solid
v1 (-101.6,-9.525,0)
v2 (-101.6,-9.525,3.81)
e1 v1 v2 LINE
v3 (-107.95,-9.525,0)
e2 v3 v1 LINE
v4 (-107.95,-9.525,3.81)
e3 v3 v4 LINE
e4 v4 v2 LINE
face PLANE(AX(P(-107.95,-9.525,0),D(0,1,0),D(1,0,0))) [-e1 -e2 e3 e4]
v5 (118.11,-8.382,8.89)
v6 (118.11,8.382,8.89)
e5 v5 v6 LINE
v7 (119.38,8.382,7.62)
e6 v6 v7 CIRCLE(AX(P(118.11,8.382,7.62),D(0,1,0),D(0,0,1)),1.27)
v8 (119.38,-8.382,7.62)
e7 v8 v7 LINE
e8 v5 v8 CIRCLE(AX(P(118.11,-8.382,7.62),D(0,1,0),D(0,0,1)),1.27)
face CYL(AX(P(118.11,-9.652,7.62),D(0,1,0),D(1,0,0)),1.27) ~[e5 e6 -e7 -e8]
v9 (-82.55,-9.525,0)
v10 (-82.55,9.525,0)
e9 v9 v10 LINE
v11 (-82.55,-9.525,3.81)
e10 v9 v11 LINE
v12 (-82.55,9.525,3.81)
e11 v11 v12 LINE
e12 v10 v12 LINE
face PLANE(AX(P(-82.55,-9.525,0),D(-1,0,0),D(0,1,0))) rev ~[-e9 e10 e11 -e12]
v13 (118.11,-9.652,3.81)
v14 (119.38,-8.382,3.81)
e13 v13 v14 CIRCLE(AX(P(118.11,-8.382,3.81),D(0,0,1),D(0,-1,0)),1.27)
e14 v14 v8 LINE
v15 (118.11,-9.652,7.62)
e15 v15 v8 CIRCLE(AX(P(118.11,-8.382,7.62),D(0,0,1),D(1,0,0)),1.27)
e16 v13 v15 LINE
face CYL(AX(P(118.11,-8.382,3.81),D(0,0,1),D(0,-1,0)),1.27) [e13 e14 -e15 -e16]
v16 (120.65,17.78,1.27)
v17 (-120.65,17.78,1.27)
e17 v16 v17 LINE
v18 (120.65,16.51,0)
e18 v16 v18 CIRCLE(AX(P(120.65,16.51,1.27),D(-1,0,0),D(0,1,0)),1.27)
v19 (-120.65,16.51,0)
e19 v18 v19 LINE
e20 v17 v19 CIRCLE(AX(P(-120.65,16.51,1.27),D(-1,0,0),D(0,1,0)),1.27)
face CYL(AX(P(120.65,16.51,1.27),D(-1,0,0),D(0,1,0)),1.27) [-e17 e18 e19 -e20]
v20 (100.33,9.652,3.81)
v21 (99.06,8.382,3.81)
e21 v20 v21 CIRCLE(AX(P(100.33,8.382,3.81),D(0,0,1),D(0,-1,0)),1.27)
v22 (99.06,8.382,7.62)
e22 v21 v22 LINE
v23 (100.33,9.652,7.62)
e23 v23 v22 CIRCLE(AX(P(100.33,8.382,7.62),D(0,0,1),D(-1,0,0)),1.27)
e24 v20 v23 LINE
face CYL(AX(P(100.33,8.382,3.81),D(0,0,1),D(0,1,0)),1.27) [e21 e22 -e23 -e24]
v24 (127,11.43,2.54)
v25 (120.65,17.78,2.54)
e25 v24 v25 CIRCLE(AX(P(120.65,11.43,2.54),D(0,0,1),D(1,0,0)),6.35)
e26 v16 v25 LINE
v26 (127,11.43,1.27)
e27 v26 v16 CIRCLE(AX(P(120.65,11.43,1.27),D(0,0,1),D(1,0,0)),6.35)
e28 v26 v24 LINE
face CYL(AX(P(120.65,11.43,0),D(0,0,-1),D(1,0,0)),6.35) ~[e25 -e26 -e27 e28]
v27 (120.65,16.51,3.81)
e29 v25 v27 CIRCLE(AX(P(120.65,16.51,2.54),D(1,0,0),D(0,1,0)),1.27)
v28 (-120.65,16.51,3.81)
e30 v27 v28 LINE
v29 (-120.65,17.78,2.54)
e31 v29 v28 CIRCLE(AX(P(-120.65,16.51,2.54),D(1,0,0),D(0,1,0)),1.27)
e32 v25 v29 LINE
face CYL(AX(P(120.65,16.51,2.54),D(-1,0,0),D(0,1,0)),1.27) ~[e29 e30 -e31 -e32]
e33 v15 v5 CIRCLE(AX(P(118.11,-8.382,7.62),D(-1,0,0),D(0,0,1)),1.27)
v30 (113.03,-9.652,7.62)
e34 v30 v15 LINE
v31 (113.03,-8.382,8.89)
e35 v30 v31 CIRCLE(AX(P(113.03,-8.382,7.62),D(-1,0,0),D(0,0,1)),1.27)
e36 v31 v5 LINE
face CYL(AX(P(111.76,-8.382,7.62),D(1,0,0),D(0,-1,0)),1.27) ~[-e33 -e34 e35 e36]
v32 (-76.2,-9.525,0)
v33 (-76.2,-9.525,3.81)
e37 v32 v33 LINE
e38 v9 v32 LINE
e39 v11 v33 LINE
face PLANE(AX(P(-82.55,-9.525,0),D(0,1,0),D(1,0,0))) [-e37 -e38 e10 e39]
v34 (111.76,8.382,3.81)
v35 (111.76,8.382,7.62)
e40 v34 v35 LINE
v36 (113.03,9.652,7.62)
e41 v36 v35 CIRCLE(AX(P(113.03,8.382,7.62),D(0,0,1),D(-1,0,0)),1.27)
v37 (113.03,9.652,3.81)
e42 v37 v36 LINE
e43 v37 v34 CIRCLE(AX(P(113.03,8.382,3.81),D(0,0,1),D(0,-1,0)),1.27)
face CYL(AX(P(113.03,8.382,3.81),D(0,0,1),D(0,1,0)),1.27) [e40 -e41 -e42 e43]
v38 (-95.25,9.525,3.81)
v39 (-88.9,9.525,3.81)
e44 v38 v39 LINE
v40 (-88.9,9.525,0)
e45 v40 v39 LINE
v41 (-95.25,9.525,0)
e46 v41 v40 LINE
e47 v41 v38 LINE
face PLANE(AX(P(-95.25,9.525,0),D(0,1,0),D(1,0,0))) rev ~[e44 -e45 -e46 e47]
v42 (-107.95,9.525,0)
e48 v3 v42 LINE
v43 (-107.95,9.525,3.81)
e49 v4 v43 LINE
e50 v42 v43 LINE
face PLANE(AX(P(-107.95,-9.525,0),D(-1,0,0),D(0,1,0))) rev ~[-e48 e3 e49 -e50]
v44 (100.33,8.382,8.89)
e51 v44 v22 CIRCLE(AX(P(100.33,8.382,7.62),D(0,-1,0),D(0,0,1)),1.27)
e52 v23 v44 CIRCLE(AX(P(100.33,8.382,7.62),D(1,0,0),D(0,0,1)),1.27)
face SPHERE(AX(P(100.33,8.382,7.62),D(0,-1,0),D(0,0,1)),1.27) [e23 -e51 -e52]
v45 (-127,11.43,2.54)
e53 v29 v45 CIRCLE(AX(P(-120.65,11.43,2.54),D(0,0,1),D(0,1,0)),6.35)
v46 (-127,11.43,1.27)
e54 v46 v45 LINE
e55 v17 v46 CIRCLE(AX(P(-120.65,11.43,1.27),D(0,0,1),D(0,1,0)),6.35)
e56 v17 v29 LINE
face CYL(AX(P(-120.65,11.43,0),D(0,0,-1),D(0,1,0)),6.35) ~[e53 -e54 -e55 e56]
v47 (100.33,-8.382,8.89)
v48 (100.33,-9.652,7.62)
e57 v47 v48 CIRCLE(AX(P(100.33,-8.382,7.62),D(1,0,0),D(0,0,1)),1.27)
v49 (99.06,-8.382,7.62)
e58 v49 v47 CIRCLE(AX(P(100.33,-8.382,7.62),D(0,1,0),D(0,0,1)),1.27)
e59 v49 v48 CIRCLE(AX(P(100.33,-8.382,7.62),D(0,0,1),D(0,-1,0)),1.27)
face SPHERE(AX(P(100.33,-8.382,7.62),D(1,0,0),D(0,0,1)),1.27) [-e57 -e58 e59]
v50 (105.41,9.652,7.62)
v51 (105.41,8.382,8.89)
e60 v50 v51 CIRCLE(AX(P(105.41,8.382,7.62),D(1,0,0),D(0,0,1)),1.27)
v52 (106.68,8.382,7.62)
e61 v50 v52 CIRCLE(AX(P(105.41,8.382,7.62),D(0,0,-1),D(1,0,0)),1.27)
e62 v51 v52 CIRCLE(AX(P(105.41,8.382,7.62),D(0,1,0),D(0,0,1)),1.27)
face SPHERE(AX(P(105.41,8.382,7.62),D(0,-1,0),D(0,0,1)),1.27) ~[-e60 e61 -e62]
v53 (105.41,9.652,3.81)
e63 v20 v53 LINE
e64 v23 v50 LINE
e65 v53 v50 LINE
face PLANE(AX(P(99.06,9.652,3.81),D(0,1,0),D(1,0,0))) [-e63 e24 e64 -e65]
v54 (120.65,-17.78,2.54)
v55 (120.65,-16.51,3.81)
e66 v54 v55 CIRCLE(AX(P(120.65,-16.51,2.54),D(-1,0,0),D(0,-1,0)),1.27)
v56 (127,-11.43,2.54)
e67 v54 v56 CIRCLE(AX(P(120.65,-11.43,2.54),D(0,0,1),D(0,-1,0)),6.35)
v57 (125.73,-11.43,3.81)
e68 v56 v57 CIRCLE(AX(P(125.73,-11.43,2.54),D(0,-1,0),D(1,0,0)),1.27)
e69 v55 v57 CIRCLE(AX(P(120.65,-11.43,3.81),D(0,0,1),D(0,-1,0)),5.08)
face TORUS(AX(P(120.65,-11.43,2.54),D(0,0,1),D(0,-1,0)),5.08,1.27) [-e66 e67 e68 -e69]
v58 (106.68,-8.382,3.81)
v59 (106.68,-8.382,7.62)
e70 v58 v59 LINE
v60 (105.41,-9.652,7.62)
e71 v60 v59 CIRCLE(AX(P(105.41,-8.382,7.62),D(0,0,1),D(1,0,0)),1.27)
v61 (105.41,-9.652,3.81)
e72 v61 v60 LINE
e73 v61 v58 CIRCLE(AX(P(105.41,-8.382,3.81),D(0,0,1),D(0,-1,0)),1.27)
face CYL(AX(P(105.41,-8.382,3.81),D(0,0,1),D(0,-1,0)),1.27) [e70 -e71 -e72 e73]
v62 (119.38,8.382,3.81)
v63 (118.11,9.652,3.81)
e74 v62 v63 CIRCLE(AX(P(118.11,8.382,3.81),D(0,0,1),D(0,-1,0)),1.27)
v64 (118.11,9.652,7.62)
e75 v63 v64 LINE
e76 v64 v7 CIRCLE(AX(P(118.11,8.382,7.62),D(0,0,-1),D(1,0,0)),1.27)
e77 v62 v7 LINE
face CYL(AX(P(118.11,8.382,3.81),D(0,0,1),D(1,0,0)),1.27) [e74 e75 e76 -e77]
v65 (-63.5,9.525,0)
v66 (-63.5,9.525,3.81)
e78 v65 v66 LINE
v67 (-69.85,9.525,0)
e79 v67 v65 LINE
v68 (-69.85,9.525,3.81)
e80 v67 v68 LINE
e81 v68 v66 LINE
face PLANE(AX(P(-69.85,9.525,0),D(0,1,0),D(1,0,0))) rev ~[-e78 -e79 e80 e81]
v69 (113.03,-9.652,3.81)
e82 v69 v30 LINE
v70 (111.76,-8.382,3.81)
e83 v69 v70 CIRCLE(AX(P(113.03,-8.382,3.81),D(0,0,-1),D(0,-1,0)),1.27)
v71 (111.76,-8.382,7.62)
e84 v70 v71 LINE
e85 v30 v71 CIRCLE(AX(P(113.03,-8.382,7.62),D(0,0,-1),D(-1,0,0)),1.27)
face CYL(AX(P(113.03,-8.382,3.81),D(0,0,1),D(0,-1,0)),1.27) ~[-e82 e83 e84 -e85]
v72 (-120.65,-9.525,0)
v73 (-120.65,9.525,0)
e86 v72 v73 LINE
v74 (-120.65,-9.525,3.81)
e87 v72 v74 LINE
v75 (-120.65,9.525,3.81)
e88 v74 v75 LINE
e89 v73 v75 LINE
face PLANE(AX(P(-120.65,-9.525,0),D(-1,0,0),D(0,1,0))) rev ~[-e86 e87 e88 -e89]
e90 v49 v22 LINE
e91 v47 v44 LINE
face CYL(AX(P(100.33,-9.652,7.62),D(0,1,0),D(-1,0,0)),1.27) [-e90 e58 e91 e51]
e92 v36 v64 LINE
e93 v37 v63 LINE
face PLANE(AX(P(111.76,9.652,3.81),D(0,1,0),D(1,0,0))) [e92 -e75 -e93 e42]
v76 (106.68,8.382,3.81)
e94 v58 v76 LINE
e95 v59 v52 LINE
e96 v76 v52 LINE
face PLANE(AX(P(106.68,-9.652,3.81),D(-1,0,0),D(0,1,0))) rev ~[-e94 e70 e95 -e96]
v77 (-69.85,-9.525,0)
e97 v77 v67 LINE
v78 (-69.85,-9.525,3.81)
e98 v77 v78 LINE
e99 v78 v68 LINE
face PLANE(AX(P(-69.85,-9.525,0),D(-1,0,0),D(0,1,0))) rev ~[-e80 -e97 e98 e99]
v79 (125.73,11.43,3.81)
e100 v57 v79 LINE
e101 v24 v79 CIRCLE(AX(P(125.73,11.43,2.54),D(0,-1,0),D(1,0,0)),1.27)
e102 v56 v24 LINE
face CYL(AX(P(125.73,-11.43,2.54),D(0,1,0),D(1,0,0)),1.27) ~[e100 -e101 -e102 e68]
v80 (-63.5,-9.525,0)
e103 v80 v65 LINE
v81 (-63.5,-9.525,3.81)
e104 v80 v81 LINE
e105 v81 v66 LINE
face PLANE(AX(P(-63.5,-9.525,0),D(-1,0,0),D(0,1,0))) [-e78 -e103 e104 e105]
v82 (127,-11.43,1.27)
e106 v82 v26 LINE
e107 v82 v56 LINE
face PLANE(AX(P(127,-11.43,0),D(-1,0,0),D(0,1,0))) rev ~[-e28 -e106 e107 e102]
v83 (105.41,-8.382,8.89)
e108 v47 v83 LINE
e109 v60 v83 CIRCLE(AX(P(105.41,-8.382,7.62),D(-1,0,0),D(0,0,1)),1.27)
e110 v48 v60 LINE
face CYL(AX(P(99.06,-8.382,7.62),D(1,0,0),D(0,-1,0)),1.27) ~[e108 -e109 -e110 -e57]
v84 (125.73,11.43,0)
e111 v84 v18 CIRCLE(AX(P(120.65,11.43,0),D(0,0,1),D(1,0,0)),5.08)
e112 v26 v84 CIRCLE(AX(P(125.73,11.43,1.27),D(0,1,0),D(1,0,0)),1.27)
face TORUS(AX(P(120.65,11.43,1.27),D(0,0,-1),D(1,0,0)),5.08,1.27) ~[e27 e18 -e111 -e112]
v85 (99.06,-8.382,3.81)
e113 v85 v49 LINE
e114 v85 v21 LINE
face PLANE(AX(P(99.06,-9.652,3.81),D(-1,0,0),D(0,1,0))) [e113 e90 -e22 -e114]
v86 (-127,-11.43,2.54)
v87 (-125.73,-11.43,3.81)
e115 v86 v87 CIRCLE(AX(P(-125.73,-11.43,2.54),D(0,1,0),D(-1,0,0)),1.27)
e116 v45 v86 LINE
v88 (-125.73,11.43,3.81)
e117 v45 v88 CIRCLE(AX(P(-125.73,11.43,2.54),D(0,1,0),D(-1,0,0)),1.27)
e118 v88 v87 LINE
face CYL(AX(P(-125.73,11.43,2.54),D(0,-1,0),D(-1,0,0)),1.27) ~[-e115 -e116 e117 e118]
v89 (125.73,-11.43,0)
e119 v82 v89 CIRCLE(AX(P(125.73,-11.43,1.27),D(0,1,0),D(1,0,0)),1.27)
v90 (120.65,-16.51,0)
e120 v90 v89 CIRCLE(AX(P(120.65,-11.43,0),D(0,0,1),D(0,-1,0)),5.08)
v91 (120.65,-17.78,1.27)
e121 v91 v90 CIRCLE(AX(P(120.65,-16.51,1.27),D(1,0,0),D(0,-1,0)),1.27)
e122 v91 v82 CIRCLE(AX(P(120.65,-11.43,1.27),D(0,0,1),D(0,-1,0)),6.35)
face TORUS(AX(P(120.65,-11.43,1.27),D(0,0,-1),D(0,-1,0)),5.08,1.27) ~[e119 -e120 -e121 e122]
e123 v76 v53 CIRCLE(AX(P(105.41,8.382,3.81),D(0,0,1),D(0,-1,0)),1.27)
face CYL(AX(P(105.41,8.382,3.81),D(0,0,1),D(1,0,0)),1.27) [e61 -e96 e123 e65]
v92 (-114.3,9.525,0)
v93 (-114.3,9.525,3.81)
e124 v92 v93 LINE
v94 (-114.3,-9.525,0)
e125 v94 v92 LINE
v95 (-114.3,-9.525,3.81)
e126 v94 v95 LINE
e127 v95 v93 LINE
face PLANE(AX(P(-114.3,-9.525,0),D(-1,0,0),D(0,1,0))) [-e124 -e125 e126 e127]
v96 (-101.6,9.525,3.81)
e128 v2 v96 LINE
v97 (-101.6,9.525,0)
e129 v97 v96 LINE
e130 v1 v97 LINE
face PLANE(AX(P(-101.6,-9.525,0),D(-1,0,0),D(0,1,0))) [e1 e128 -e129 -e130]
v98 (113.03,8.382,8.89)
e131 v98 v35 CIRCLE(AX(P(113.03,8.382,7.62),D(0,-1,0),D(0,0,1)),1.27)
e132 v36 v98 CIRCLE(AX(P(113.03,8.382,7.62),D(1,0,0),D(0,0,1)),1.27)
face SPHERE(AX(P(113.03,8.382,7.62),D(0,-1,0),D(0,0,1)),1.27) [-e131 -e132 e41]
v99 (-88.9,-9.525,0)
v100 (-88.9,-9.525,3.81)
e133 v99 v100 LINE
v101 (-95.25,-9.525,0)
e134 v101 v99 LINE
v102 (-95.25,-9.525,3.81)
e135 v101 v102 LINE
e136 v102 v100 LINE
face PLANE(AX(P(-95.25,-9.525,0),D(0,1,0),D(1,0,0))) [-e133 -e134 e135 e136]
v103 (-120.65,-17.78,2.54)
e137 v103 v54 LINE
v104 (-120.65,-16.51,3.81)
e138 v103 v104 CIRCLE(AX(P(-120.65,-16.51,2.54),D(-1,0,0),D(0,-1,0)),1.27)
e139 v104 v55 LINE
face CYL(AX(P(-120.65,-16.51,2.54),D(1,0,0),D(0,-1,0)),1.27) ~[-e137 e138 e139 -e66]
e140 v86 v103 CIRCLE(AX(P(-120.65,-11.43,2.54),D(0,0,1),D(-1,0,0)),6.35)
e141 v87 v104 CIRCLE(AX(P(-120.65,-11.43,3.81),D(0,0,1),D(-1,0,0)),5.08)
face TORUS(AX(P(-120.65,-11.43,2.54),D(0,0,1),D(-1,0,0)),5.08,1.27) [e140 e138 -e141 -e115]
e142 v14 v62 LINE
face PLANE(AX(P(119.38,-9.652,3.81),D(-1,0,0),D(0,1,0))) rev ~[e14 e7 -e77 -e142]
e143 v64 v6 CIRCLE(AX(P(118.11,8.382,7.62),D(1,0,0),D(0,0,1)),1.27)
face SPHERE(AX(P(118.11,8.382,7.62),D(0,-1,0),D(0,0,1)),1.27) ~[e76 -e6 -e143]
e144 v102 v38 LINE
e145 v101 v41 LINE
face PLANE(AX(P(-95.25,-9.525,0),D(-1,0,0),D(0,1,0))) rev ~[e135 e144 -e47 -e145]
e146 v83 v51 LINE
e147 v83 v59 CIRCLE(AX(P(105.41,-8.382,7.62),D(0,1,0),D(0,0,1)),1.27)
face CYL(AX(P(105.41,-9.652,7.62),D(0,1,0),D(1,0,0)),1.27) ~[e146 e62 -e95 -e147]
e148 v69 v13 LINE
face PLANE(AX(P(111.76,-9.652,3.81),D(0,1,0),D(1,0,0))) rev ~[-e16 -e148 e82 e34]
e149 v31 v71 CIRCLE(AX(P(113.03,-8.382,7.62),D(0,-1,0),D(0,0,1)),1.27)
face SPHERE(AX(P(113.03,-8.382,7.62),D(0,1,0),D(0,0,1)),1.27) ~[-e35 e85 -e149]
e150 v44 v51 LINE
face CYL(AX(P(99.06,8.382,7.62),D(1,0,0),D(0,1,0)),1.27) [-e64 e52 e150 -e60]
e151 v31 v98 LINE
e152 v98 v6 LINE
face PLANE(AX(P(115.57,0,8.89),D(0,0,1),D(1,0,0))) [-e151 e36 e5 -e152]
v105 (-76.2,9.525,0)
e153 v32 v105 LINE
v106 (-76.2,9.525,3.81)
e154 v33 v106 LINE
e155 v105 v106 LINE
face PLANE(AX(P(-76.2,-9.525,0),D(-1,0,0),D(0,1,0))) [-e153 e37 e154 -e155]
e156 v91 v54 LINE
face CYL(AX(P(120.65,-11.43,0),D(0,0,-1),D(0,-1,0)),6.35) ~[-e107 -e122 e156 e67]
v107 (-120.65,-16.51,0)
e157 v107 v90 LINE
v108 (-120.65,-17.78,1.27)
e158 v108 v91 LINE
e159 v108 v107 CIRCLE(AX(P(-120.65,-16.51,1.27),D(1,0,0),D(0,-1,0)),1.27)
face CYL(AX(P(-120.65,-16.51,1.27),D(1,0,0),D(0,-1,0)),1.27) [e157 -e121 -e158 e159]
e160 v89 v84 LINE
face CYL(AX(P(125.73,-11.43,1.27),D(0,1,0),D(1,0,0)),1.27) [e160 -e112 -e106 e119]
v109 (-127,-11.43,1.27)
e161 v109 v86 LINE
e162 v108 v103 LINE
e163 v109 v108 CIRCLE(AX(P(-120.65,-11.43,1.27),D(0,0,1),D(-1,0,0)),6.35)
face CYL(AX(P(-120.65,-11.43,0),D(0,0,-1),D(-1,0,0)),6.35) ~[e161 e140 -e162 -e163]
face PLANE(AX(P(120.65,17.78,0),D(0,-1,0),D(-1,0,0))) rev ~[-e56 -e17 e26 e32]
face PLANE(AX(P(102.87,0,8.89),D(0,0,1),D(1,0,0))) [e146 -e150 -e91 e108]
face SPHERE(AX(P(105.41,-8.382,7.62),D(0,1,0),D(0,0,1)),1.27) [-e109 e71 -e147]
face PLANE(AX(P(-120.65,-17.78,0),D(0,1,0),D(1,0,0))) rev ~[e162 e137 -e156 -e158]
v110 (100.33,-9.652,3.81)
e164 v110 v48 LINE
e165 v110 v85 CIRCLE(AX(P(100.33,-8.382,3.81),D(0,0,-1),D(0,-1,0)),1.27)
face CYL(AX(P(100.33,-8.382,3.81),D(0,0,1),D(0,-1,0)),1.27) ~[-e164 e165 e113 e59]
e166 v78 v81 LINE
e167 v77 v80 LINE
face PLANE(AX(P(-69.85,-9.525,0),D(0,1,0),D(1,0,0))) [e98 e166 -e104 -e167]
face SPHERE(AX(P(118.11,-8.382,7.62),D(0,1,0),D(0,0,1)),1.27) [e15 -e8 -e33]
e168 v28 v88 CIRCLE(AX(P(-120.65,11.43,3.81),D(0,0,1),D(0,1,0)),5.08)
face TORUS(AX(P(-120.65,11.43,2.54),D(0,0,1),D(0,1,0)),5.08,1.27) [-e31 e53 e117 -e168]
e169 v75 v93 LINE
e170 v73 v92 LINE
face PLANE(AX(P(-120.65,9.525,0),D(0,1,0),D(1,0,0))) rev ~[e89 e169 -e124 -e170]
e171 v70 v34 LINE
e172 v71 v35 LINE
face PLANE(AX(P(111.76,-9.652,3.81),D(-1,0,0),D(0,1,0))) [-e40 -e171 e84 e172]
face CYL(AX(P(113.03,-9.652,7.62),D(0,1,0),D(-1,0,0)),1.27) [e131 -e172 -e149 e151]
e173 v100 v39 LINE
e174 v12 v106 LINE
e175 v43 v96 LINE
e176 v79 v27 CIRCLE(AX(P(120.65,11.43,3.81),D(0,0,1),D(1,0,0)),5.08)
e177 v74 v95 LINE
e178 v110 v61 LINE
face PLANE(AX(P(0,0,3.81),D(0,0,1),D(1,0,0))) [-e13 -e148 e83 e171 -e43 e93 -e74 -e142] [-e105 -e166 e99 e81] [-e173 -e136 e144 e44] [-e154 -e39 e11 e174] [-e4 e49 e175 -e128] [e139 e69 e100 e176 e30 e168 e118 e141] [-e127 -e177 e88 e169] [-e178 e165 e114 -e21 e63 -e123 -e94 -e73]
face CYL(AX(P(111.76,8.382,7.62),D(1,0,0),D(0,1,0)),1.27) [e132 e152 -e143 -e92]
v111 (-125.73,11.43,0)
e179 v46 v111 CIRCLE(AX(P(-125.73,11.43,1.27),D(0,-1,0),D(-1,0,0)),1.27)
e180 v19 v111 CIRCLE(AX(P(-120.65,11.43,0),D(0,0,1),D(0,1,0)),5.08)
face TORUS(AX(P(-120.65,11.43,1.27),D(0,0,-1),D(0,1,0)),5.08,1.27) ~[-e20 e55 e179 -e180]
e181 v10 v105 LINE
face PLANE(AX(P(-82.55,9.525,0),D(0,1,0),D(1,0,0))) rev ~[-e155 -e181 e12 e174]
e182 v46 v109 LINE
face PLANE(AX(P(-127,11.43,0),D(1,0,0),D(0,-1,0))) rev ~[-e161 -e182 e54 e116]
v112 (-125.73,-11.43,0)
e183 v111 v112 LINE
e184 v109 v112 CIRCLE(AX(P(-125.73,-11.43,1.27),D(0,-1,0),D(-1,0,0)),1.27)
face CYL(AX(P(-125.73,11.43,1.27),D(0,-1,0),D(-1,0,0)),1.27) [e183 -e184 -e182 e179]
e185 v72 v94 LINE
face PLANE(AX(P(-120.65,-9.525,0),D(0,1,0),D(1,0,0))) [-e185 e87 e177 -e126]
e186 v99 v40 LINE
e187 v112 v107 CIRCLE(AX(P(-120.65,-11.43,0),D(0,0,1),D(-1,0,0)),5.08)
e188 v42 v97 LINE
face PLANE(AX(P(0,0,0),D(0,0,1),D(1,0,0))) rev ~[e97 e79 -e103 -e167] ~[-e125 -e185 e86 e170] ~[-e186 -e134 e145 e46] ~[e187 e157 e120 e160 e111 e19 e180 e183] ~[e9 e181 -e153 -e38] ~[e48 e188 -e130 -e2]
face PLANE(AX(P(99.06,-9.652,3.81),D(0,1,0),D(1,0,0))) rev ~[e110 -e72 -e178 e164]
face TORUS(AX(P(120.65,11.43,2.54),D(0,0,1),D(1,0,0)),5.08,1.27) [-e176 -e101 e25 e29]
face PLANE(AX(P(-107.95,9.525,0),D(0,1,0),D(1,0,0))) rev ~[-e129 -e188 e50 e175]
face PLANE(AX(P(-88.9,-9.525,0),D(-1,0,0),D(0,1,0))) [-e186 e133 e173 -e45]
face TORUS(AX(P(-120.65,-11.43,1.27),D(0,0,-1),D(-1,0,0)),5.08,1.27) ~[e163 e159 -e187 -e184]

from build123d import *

# Parameters (mm, degrees)
F0_W     = 6.35
F0_H     = 19.05
F0_R     = 17.5576306553
F1_DEPTH = 3.81
F2_R     = 1.27
F3_W     = 7.62
F3_H     = 19.304
F4_DEPTH = 5.08
F5_R     = 1.27


# Not quite as in the source:
# - a feature names something its author has since deleted; it is built from what else it names


with BuildPart() as f1:
    # F0 (on Top) → F1 (new body)
    with BuildSketch(Plane.XY):
        with BuildLine():
            ThreePointArc((127, 11.43), (125.1401280605, 15.9201280605), (120.65, 17.78))
            Line((120.65, 17.78), (-120.65, 17.78))
            ThreePointArc((-120.65, 17.78), (-125.1401280605, 15.9201280605), (-127, 11.43))
            Line((-127, 11.43), (-127, -11.43))
            ThreePointArc((-127, -11.43), (-125.1401280605, -15.9201280605), (-120.65, -17.78))
            Line((-120.65, -17.78), (120.65, -17.78))
            ThreePointArc((120.65, -17.78), (125.1401280605, -15.9201280605), (127, -11.43))
            Line((127, -11.43), (127, 11.43))
        make_face()
        with Locations((-117.475, 0)):
            Rectangle(F0_W, F0_H, mode=Mode.SUBTRACT)
        with Locations((-104.775, 0)):
            Rectangle(F0_W, F0_H, mode=Mode.SUBTRACT)
        with Locations((-92.075, 0)):
            Rectangle(F0_W, F0_H, mode=Mode.SUBTRACT)
        with Locations((-79.375, 0)):
            Rectangle(F0_W, F0_H, mode=Mode.SUBTRACT)
        with Locations((-66.675, 0)):
            Rectangle(F0_W, F0_H, mode=Mode.SUBTRACT)
        with Locations((4.1378471069, 0)):
            Circle(F0_R, mode=Mode.SUBTRACT)
        with Locations((4.1378471069, 0)):
            Circle(F0_R)
    extrude(amount=F1_DEPTH)

    # F2
    f2_edges = [f1.edges().sort_by_distance(p)[0] for p in [
        (0, -17.78, 0),
        (0, -17.78, 3.81),
    ]]
    fillet(f2_edges, radius=F2_R)

    # F3 (on face) → F4 (join)
    with BuildSketch(Plane.XY.offset(3.81)):
        with Locations((102.87, 0)):
            Rectangle(F3_W, F3_H)
        with Locations((115.57, 0)):
            Rectangle(F3_W, F3_H)
    extrude(amount=F4_DEPTH)

    # F5
    f5_edges = [f1.edges().sort_by_distance(p)[0] for p in [
        (106.68, 0, 8.89),
        (102.87, -9.652, 8.89),
        (99.06, 0, 8.89),
        (102.87, 9.652, 8.89),
        (111.76, 0, 8.89),
        (119.38, 0, 8.89),
        (115.57, -9.652, 8.89),
        (115.57, 9.652, 8.89),
        (119.38, -9.652, 6.35),
        (111.76, -9.652, 6.35),
        (106.68, -9.652, 6.35),
        (99.06, -9.652, 6.35),
        (106.68, 9.652, 6.35),
        (119.38, 9.652, 6.35),
        (111.76, 9.652, 6.35),
        (99.06, 9.652, 6.35),
    ]]
    fillet(f5_edges, radius=F5_R)


solid = f1.part
